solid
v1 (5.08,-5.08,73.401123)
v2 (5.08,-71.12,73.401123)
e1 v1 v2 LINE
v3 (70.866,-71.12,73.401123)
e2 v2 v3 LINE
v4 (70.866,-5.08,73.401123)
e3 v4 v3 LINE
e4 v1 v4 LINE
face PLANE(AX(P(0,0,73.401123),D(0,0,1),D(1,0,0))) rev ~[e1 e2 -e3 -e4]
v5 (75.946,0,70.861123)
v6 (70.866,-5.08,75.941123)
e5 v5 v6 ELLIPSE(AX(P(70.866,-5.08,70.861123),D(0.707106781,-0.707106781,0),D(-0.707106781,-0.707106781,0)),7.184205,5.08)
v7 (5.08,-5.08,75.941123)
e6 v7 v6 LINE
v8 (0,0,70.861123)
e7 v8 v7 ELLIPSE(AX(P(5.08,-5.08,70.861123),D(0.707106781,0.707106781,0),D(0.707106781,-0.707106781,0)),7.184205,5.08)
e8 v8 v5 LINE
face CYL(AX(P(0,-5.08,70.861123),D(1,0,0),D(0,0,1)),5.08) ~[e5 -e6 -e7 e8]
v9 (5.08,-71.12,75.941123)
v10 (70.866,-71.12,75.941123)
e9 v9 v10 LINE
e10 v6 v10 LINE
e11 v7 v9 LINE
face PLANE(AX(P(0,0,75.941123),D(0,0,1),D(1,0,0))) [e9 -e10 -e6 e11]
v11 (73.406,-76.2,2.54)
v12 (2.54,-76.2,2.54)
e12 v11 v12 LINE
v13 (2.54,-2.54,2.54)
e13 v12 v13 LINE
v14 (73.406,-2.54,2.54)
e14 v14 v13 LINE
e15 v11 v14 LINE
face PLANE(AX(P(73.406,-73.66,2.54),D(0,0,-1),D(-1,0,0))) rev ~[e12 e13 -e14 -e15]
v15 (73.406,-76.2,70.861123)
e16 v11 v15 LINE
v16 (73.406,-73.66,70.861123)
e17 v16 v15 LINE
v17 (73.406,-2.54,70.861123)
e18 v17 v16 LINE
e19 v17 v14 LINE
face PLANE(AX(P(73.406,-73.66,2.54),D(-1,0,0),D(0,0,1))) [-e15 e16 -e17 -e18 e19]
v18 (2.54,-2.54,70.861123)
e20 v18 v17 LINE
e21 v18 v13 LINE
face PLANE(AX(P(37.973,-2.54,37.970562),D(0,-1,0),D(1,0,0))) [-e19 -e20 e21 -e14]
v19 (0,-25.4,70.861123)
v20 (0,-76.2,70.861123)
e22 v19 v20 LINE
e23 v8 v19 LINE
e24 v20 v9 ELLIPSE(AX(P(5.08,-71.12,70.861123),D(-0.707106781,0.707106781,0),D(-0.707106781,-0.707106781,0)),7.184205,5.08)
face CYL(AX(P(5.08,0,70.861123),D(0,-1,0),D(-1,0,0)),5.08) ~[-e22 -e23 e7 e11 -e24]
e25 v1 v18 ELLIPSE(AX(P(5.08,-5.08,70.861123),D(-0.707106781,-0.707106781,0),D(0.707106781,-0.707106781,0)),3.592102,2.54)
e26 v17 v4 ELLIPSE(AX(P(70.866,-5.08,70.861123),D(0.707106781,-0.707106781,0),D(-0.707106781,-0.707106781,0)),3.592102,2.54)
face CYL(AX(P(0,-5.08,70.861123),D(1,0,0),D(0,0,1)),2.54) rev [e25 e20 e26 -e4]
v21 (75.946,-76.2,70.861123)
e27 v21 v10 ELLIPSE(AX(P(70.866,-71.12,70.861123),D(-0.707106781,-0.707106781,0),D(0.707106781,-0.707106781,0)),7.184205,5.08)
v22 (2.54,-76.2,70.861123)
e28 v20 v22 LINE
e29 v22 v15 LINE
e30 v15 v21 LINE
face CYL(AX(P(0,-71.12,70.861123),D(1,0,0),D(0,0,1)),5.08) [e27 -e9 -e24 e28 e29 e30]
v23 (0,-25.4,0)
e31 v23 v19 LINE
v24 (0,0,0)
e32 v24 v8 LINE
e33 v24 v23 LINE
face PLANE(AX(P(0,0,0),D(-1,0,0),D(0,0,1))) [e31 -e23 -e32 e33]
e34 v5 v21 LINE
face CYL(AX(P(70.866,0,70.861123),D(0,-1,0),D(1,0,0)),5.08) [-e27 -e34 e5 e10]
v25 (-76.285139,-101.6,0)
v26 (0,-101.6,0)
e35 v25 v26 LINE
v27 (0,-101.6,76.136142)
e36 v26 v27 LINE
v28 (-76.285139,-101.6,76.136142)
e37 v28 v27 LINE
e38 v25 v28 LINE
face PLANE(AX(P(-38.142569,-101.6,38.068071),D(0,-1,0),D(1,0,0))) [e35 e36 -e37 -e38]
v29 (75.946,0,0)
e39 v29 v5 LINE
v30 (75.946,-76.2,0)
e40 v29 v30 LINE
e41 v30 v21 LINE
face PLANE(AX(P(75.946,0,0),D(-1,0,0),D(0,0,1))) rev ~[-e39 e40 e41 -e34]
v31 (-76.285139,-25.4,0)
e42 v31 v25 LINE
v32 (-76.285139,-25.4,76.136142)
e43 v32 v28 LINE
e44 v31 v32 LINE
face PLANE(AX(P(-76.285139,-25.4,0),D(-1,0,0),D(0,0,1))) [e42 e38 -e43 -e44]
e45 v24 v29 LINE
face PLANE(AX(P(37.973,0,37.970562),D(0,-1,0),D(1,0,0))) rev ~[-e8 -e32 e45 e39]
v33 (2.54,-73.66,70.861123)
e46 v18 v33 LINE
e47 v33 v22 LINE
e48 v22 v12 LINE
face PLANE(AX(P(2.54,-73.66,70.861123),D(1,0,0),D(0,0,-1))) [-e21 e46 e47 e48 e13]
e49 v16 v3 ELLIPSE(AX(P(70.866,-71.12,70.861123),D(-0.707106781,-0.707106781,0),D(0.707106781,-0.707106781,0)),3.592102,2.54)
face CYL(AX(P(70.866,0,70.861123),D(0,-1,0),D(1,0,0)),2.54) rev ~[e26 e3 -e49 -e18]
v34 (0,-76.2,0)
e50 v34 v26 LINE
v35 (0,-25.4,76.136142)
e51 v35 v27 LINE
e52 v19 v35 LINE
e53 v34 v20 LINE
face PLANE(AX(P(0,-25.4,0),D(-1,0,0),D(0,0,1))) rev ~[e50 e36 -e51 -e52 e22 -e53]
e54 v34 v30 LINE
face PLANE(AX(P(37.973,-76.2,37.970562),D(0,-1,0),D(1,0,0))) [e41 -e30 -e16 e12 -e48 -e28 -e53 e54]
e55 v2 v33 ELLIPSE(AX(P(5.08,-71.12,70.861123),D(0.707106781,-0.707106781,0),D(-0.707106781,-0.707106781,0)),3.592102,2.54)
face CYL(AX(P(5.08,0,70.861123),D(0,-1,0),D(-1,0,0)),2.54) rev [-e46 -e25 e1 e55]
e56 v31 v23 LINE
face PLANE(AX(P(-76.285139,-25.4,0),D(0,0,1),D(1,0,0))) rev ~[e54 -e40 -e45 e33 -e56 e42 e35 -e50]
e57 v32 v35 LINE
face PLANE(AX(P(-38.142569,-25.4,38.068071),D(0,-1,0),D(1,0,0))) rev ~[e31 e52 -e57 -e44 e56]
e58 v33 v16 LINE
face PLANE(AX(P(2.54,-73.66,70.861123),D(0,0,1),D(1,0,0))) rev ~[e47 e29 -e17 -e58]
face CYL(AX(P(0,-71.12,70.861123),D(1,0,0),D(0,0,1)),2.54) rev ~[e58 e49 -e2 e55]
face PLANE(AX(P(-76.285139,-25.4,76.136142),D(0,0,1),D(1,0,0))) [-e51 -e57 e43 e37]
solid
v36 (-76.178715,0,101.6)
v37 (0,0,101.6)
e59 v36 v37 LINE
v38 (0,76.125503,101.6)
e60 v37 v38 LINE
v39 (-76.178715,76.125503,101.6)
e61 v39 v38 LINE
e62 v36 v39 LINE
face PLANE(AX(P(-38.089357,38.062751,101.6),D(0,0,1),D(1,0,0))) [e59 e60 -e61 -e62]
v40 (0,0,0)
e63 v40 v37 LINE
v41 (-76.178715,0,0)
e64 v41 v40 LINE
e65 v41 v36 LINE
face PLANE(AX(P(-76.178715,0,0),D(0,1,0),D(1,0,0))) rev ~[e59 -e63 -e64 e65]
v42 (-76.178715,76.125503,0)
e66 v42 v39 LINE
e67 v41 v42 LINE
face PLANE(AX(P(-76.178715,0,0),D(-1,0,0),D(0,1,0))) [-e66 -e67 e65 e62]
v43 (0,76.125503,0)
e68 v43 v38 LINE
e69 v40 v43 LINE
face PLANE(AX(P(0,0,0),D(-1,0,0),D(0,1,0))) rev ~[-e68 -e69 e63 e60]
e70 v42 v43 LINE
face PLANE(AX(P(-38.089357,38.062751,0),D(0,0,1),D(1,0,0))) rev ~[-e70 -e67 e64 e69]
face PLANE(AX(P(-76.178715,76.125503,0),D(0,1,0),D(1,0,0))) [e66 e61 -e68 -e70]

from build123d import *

# Parameters (mm, degrees)
F0_W     = 75.946
F0_H     = 75.9411230683
F1_DEPTH = 76.2
F3_R     = 5.08
F4_T     = -2.54
F5_W     = 76.2851387262
F5_H     = 76.1361420155
F6_DEPTH = 76.2
F7_W     = 76.178714633
F7_H     = 76.1255025864
F8_DEPTH = 101.6


# Not quite as in the source:
# - a shell that OpenCascade refuses in one call is made with other operations: the cavity is built on its own and cut out


with BuildPart() as f1:
    # F0 (on Front) → F1 (new body)
    with BuildSketch(Plane.XZ):
        with Locations((37.973, 37.9705615342)):
            Rectangle(F0_W, F0_H)
    extrude(amount=F1_DEPTH)

    # F3
    f3_edges = [f1.edges().sort_by_distance(p)[0] for p in [
        (75.946, -38.1, 75.941123),
        (0, -38.1, 75.941123),
        (37.973, 0, 75.941123),
        (37.973, -76.2, 75.941123),
    ]]
    fillet(f3_edges, radius=F3_R)

    # F4: a shell. OpenCascade refuses it in one call, so the cavity is built on its own and cut out:
    # the body offset inwards by the wall thickness, plus a prism from it out through each open face.
    f4_core = offset(f1.part, amount=F4_T, mode=Mode.PRIVATE)
    f4_exits = [f4_core.faces().sort_by_distance(p)[0] for p in [
        (37.973, -73.66, 36.700562),
    ]]
    add(f4_core, mode=Mode.SUBTRACT)
    extrude(f4_exits, amount=-F4_T, mode=Mode.SUBTRACT)

    # F5 (on offset) → F6 (join)
    with BuildSketch(Plane.XZ.offset(25.4)):
        with Locations((-38.1425693631, 38.0680710077)):
            Rectangle(F5_W, F5_H)
    extrude(amount=F6_DEPTH)


with BuildPart() as f8:
    # F7 (on Top) → F8 (new body)
    with BuildSketch(Plane.XY):
        with Locations((-38.0893573165, 38.0627512932)):
            Rectangle(F7_W, F7_H)
    extrude(amount=F8_DEPTH)


solid = Compound([f1.part, f8.part])
